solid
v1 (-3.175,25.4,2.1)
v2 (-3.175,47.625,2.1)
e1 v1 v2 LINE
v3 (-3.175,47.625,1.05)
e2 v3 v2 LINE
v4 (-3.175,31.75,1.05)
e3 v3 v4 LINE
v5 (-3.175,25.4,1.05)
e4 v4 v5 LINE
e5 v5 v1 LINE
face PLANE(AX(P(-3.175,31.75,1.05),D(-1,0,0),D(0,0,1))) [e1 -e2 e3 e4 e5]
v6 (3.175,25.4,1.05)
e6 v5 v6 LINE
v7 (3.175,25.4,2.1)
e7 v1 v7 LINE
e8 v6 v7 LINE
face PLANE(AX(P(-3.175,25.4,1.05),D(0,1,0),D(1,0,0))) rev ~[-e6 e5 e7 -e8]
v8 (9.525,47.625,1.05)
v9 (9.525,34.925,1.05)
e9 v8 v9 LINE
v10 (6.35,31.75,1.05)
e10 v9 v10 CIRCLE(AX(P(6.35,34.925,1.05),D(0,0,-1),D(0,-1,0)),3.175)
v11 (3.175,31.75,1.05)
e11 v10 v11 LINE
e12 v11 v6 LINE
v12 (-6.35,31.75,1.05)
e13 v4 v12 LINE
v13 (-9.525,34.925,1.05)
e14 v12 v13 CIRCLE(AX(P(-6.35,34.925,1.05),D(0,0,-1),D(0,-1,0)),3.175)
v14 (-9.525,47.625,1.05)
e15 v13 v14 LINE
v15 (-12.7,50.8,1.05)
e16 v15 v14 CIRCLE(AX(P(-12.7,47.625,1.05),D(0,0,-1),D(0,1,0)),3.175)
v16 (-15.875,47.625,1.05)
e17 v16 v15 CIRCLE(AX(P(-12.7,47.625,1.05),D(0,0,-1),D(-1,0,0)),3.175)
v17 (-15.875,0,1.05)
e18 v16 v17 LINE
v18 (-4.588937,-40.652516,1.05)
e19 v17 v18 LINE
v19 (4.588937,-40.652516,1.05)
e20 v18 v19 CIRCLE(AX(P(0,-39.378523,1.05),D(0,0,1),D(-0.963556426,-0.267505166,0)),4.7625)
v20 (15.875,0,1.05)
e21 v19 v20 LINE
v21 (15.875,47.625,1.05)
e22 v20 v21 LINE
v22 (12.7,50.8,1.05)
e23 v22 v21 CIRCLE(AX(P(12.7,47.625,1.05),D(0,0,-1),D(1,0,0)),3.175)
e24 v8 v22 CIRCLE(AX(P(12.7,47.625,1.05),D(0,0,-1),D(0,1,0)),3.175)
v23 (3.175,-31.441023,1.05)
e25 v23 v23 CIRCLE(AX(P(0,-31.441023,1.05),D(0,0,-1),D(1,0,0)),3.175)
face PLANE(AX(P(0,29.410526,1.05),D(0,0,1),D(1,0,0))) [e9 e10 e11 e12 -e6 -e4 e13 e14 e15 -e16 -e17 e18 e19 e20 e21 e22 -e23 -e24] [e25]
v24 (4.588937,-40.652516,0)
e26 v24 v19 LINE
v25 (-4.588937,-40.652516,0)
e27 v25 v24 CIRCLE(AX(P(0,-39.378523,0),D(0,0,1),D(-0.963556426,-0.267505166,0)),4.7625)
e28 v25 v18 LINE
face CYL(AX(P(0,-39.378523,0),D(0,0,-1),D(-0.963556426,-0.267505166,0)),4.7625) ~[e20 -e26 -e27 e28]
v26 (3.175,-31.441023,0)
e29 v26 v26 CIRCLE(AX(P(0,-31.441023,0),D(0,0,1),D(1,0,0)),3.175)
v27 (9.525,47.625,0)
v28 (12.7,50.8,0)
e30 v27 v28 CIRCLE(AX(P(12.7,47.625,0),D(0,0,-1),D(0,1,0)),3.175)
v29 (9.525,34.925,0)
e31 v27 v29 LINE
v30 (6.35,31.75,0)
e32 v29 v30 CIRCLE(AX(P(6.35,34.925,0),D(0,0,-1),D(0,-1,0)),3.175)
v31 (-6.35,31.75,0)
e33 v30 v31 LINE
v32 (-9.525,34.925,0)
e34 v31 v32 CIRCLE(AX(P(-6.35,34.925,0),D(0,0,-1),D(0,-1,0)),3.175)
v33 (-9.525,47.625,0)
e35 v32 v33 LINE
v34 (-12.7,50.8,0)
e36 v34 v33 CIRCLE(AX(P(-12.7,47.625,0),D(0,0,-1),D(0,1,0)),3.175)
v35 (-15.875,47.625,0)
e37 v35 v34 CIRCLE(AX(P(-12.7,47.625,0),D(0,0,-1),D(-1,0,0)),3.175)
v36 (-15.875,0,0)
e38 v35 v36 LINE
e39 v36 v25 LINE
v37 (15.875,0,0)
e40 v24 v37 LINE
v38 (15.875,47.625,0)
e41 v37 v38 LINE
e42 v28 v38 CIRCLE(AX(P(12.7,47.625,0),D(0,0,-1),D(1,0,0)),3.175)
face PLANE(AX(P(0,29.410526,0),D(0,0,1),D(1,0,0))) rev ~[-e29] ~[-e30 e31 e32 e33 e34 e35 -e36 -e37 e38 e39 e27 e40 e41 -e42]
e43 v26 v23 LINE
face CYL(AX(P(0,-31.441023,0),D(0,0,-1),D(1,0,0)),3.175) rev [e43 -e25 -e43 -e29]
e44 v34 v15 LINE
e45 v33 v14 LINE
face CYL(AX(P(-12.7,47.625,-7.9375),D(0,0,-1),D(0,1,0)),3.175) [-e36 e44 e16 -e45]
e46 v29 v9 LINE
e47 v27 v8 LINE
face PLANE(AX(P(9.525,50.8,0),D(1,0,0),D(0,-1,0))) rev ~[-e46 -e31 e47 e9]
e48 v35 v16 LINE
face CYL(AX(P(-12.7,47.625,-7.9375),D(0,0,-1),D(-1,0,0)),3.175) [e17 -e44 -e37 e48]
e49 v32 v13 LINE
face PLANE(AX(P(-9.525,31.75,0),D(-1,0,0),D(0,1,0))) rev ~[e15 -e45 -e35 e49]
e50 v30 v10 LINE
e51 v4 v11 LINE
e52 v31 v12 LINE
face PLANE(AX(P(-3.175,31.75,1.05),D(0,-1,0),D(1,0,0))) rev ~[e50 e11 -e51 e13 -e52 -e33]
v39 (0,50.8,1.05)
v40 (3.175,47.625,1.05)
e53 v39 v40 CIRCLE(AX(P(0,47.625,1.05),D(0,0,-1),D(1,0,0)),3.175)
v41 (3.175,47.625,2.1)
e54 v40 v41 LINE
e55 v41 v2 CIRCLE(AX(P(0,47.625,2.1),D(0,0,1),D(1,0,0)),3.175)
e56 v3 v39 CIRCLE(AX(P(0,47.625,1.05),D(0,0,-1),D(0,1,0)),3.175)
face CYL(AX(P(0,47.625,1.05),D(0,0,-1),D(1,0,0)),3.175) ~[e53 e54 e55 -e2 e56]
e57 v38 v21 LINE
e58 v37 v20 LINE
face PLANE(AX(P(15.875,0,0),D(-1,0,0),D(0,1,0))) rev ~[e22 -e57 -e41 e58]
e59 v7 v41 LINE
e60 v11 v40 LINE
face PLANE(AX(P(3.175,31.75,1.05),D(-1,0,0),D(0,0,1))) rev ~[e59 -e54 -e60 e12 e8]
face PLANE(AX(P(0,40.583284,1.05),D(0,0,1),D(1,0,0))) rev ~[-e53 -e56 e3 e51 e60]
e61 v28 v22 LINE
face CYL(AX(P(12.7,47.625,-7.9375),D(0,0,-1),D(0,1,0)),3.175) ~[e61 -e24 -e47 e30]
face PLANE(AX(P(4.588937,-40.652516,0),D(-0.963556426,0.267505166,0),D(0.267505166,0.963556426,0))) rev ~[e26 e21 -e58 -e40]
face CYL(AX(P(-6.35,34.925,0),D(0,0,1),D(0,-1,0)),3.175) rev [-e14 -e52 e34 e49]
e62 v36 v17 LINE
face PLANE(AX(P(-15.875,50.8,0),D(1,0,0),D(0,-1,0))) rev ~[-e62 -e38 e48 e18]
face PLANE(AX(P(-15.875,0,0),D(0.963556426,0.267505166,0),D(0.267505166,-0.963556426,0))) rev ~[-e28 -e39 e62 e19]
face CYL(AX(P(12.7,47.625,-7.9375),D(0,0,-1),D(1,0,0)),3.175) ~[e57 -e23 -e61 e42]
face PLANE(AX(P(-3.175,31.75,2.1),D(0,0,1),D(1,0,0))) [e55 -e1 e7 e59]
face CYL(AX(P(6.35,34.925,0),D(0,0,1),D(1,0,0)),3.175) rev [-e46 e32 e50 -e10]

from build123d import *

# Parameters (mm, degrees)
F1_DEPTH    = 1.05
F2_R        = 3.175
F3_DEPTH    = 28.1652770936
F4_T1_DEPTH = 16.925
F6_DEPTH    = 1.05
F7_DEPTH    = 6.35
F8_DEPTH    = 1.05
F9_R        = 3.175


# Not quite as in the source:
# - a fillet or chamfer that OpenCascade refuses, or shapes differently, is made with other operations: its cross-section is extruded or revolved along the edge and cut away or added


with BuildPart() as f1:
    # F0 (on Top) → F1 (new body)
    with BuildSketch(Plane.XY):
        Polygon((-15.875, 0), (15.875, 0), (15.875, 50.8), (9.525, 50.8), (9.525, 31.75), (3.175, 31.75), (3.175, 50.8), (-3.175, 50.8), (-3.175, 31.75), (-9.525, 31.75), (-9.525, 50.8), (-15.875, 50.8), align=None)
        with BuildLine():
            Line((4.5889374784, -40.6525160217), (15.875, 0))
            Line((15.875, 0), (-15.875, 0))
            Line((-15.875, 0), (-4.5889374784, -40.6525160217))
            ThreePointArc((-4.5889374784, -40.6525160217), (0, -44.1410226664), (4.5889374784, -40.6525160217))
        make_face()
    extrude(amount=F1_DEPTH)

    # F2 (on face) → F3 (cut)
    with BuildSketch(Plane.XY):
        with Locations((0, -31.4410226664)):
            Circle(F2_R)
    extrude(amount=F3_DEPTH, mode=Mode.SUBTRACT)

    # F4: fillet of radius 3.175 on 6 edges, made by hand

    # F4_s2 → F4_t1 (cut)
    with BuildSketch(Plane.XY.offset(-7.9375)):
        with BuildLine():
            ThreePointArc((15.875, 47.625), (14.9450640303, 49.8700640303), (12.7, 50.8))
            Line((12.7, 50.8), (15.875, 50.8))
            Line((15.875, 50.8), (15.875, 47.625))
        make_face()
        with BuildLine():
            ThreePointArc((12.7, 50.8), (10.4549359697, 49.8700640303), (9.525, 47.625))
            Line((9.525, 47.625), (9.525, 50.8))
            Line((9.525, 50.8), (12.7, 50.8))
        make_face()
        with BuildLine():
            ThreePointArc((3.175, 47.625), (2.2450640303, 49.8700640303), (0, 50.8))
            Line((0, 50.8), (3.175, 50.8))
            Line((3.175, 50.8), (3.175, 47.625))
        make_face()
        with BuildLine():
            ThreePointArc((0, 50.8), (-2.2450640303, 49.8700640303), (-3.175, 47.625))
            Line((-3.175, 47.625), (-3.175, 50.8))
            Line((-3.175, 50.8), (0, 50.8))
        make_face()
        with BuildLine():
            ThreePointArc((-12.7, 50.8), (-10.4549359697, 49.8700640303), (-9.525, 47.625))
            Line((-9.525, 47.625), (-9.525, 50.8))
            Line((-9.525, 50.8), (-12.7, 50.8))
        make_face()
        with BuildLine():
            ThreePointArc((-15.875, 47.625), (-14.9450640303, 49.8700640303), (-12.7, 50.8))
            Line((-12.7, 50.8), (-15.875, 50.8))
            Line((-15.875, 50.8), (-15.875, 47.625))
        make_face()
    extrude(amount=F4_T1_DEPTH, mode=Mode.SUBTRACT)

    # F5 (on face) → F6 (join)
    with BuildSketch(Plane.XY.offset(1.05)):
        with BuildLine():
            Line((-3.175, 47.625), (-3.175, 31.75))
            Line((-3.175, 31.75), (3.175, 31.75))
            Line((3.175, 31.75), (3.175, 47.625))
            ThreePointArc((3.175, 47.625), (0, 50.8), (-3.175, 47.625))
        make_face()
    extrude(amount=F6_DEPTH)

    # F7 (add): a face of the model
    f7_faces = [f1.faces().sort_by_distance(p)[0] for p in [
        (0, 31.75, 1.575),
    ]]
    extrude(f7_faces, amount=F7_DEPTH)

    # F5 (on face) → F8 (cut)
    with BuildSketch(Plane.XY.offset(1.05)):
        with BuildLine():
            Line((-3.175, 47.625), (-3.175, 31.75))
            Line((-3.175, 31.75), (3.175, 31.75))
            Line((3.175, 31.75), (3.175, 47.625))
            ThreePointArc((3.175, 47.625), (0, 50.8), (-3.175, 47.625))
        make_face()
    extrude(amount=-F8_DEPTH, mode=Mode.SUBTRACT)

    # F9
    f9_edges = [f1.edges().sort_by_distance(p)[0] for p in [
        (-9.525, 31.75, 0.525),
        (9.525, 31.75, 0.525),
    ]]
    fillet(f9_edges, radius=F9_R)


solid = f1.part
